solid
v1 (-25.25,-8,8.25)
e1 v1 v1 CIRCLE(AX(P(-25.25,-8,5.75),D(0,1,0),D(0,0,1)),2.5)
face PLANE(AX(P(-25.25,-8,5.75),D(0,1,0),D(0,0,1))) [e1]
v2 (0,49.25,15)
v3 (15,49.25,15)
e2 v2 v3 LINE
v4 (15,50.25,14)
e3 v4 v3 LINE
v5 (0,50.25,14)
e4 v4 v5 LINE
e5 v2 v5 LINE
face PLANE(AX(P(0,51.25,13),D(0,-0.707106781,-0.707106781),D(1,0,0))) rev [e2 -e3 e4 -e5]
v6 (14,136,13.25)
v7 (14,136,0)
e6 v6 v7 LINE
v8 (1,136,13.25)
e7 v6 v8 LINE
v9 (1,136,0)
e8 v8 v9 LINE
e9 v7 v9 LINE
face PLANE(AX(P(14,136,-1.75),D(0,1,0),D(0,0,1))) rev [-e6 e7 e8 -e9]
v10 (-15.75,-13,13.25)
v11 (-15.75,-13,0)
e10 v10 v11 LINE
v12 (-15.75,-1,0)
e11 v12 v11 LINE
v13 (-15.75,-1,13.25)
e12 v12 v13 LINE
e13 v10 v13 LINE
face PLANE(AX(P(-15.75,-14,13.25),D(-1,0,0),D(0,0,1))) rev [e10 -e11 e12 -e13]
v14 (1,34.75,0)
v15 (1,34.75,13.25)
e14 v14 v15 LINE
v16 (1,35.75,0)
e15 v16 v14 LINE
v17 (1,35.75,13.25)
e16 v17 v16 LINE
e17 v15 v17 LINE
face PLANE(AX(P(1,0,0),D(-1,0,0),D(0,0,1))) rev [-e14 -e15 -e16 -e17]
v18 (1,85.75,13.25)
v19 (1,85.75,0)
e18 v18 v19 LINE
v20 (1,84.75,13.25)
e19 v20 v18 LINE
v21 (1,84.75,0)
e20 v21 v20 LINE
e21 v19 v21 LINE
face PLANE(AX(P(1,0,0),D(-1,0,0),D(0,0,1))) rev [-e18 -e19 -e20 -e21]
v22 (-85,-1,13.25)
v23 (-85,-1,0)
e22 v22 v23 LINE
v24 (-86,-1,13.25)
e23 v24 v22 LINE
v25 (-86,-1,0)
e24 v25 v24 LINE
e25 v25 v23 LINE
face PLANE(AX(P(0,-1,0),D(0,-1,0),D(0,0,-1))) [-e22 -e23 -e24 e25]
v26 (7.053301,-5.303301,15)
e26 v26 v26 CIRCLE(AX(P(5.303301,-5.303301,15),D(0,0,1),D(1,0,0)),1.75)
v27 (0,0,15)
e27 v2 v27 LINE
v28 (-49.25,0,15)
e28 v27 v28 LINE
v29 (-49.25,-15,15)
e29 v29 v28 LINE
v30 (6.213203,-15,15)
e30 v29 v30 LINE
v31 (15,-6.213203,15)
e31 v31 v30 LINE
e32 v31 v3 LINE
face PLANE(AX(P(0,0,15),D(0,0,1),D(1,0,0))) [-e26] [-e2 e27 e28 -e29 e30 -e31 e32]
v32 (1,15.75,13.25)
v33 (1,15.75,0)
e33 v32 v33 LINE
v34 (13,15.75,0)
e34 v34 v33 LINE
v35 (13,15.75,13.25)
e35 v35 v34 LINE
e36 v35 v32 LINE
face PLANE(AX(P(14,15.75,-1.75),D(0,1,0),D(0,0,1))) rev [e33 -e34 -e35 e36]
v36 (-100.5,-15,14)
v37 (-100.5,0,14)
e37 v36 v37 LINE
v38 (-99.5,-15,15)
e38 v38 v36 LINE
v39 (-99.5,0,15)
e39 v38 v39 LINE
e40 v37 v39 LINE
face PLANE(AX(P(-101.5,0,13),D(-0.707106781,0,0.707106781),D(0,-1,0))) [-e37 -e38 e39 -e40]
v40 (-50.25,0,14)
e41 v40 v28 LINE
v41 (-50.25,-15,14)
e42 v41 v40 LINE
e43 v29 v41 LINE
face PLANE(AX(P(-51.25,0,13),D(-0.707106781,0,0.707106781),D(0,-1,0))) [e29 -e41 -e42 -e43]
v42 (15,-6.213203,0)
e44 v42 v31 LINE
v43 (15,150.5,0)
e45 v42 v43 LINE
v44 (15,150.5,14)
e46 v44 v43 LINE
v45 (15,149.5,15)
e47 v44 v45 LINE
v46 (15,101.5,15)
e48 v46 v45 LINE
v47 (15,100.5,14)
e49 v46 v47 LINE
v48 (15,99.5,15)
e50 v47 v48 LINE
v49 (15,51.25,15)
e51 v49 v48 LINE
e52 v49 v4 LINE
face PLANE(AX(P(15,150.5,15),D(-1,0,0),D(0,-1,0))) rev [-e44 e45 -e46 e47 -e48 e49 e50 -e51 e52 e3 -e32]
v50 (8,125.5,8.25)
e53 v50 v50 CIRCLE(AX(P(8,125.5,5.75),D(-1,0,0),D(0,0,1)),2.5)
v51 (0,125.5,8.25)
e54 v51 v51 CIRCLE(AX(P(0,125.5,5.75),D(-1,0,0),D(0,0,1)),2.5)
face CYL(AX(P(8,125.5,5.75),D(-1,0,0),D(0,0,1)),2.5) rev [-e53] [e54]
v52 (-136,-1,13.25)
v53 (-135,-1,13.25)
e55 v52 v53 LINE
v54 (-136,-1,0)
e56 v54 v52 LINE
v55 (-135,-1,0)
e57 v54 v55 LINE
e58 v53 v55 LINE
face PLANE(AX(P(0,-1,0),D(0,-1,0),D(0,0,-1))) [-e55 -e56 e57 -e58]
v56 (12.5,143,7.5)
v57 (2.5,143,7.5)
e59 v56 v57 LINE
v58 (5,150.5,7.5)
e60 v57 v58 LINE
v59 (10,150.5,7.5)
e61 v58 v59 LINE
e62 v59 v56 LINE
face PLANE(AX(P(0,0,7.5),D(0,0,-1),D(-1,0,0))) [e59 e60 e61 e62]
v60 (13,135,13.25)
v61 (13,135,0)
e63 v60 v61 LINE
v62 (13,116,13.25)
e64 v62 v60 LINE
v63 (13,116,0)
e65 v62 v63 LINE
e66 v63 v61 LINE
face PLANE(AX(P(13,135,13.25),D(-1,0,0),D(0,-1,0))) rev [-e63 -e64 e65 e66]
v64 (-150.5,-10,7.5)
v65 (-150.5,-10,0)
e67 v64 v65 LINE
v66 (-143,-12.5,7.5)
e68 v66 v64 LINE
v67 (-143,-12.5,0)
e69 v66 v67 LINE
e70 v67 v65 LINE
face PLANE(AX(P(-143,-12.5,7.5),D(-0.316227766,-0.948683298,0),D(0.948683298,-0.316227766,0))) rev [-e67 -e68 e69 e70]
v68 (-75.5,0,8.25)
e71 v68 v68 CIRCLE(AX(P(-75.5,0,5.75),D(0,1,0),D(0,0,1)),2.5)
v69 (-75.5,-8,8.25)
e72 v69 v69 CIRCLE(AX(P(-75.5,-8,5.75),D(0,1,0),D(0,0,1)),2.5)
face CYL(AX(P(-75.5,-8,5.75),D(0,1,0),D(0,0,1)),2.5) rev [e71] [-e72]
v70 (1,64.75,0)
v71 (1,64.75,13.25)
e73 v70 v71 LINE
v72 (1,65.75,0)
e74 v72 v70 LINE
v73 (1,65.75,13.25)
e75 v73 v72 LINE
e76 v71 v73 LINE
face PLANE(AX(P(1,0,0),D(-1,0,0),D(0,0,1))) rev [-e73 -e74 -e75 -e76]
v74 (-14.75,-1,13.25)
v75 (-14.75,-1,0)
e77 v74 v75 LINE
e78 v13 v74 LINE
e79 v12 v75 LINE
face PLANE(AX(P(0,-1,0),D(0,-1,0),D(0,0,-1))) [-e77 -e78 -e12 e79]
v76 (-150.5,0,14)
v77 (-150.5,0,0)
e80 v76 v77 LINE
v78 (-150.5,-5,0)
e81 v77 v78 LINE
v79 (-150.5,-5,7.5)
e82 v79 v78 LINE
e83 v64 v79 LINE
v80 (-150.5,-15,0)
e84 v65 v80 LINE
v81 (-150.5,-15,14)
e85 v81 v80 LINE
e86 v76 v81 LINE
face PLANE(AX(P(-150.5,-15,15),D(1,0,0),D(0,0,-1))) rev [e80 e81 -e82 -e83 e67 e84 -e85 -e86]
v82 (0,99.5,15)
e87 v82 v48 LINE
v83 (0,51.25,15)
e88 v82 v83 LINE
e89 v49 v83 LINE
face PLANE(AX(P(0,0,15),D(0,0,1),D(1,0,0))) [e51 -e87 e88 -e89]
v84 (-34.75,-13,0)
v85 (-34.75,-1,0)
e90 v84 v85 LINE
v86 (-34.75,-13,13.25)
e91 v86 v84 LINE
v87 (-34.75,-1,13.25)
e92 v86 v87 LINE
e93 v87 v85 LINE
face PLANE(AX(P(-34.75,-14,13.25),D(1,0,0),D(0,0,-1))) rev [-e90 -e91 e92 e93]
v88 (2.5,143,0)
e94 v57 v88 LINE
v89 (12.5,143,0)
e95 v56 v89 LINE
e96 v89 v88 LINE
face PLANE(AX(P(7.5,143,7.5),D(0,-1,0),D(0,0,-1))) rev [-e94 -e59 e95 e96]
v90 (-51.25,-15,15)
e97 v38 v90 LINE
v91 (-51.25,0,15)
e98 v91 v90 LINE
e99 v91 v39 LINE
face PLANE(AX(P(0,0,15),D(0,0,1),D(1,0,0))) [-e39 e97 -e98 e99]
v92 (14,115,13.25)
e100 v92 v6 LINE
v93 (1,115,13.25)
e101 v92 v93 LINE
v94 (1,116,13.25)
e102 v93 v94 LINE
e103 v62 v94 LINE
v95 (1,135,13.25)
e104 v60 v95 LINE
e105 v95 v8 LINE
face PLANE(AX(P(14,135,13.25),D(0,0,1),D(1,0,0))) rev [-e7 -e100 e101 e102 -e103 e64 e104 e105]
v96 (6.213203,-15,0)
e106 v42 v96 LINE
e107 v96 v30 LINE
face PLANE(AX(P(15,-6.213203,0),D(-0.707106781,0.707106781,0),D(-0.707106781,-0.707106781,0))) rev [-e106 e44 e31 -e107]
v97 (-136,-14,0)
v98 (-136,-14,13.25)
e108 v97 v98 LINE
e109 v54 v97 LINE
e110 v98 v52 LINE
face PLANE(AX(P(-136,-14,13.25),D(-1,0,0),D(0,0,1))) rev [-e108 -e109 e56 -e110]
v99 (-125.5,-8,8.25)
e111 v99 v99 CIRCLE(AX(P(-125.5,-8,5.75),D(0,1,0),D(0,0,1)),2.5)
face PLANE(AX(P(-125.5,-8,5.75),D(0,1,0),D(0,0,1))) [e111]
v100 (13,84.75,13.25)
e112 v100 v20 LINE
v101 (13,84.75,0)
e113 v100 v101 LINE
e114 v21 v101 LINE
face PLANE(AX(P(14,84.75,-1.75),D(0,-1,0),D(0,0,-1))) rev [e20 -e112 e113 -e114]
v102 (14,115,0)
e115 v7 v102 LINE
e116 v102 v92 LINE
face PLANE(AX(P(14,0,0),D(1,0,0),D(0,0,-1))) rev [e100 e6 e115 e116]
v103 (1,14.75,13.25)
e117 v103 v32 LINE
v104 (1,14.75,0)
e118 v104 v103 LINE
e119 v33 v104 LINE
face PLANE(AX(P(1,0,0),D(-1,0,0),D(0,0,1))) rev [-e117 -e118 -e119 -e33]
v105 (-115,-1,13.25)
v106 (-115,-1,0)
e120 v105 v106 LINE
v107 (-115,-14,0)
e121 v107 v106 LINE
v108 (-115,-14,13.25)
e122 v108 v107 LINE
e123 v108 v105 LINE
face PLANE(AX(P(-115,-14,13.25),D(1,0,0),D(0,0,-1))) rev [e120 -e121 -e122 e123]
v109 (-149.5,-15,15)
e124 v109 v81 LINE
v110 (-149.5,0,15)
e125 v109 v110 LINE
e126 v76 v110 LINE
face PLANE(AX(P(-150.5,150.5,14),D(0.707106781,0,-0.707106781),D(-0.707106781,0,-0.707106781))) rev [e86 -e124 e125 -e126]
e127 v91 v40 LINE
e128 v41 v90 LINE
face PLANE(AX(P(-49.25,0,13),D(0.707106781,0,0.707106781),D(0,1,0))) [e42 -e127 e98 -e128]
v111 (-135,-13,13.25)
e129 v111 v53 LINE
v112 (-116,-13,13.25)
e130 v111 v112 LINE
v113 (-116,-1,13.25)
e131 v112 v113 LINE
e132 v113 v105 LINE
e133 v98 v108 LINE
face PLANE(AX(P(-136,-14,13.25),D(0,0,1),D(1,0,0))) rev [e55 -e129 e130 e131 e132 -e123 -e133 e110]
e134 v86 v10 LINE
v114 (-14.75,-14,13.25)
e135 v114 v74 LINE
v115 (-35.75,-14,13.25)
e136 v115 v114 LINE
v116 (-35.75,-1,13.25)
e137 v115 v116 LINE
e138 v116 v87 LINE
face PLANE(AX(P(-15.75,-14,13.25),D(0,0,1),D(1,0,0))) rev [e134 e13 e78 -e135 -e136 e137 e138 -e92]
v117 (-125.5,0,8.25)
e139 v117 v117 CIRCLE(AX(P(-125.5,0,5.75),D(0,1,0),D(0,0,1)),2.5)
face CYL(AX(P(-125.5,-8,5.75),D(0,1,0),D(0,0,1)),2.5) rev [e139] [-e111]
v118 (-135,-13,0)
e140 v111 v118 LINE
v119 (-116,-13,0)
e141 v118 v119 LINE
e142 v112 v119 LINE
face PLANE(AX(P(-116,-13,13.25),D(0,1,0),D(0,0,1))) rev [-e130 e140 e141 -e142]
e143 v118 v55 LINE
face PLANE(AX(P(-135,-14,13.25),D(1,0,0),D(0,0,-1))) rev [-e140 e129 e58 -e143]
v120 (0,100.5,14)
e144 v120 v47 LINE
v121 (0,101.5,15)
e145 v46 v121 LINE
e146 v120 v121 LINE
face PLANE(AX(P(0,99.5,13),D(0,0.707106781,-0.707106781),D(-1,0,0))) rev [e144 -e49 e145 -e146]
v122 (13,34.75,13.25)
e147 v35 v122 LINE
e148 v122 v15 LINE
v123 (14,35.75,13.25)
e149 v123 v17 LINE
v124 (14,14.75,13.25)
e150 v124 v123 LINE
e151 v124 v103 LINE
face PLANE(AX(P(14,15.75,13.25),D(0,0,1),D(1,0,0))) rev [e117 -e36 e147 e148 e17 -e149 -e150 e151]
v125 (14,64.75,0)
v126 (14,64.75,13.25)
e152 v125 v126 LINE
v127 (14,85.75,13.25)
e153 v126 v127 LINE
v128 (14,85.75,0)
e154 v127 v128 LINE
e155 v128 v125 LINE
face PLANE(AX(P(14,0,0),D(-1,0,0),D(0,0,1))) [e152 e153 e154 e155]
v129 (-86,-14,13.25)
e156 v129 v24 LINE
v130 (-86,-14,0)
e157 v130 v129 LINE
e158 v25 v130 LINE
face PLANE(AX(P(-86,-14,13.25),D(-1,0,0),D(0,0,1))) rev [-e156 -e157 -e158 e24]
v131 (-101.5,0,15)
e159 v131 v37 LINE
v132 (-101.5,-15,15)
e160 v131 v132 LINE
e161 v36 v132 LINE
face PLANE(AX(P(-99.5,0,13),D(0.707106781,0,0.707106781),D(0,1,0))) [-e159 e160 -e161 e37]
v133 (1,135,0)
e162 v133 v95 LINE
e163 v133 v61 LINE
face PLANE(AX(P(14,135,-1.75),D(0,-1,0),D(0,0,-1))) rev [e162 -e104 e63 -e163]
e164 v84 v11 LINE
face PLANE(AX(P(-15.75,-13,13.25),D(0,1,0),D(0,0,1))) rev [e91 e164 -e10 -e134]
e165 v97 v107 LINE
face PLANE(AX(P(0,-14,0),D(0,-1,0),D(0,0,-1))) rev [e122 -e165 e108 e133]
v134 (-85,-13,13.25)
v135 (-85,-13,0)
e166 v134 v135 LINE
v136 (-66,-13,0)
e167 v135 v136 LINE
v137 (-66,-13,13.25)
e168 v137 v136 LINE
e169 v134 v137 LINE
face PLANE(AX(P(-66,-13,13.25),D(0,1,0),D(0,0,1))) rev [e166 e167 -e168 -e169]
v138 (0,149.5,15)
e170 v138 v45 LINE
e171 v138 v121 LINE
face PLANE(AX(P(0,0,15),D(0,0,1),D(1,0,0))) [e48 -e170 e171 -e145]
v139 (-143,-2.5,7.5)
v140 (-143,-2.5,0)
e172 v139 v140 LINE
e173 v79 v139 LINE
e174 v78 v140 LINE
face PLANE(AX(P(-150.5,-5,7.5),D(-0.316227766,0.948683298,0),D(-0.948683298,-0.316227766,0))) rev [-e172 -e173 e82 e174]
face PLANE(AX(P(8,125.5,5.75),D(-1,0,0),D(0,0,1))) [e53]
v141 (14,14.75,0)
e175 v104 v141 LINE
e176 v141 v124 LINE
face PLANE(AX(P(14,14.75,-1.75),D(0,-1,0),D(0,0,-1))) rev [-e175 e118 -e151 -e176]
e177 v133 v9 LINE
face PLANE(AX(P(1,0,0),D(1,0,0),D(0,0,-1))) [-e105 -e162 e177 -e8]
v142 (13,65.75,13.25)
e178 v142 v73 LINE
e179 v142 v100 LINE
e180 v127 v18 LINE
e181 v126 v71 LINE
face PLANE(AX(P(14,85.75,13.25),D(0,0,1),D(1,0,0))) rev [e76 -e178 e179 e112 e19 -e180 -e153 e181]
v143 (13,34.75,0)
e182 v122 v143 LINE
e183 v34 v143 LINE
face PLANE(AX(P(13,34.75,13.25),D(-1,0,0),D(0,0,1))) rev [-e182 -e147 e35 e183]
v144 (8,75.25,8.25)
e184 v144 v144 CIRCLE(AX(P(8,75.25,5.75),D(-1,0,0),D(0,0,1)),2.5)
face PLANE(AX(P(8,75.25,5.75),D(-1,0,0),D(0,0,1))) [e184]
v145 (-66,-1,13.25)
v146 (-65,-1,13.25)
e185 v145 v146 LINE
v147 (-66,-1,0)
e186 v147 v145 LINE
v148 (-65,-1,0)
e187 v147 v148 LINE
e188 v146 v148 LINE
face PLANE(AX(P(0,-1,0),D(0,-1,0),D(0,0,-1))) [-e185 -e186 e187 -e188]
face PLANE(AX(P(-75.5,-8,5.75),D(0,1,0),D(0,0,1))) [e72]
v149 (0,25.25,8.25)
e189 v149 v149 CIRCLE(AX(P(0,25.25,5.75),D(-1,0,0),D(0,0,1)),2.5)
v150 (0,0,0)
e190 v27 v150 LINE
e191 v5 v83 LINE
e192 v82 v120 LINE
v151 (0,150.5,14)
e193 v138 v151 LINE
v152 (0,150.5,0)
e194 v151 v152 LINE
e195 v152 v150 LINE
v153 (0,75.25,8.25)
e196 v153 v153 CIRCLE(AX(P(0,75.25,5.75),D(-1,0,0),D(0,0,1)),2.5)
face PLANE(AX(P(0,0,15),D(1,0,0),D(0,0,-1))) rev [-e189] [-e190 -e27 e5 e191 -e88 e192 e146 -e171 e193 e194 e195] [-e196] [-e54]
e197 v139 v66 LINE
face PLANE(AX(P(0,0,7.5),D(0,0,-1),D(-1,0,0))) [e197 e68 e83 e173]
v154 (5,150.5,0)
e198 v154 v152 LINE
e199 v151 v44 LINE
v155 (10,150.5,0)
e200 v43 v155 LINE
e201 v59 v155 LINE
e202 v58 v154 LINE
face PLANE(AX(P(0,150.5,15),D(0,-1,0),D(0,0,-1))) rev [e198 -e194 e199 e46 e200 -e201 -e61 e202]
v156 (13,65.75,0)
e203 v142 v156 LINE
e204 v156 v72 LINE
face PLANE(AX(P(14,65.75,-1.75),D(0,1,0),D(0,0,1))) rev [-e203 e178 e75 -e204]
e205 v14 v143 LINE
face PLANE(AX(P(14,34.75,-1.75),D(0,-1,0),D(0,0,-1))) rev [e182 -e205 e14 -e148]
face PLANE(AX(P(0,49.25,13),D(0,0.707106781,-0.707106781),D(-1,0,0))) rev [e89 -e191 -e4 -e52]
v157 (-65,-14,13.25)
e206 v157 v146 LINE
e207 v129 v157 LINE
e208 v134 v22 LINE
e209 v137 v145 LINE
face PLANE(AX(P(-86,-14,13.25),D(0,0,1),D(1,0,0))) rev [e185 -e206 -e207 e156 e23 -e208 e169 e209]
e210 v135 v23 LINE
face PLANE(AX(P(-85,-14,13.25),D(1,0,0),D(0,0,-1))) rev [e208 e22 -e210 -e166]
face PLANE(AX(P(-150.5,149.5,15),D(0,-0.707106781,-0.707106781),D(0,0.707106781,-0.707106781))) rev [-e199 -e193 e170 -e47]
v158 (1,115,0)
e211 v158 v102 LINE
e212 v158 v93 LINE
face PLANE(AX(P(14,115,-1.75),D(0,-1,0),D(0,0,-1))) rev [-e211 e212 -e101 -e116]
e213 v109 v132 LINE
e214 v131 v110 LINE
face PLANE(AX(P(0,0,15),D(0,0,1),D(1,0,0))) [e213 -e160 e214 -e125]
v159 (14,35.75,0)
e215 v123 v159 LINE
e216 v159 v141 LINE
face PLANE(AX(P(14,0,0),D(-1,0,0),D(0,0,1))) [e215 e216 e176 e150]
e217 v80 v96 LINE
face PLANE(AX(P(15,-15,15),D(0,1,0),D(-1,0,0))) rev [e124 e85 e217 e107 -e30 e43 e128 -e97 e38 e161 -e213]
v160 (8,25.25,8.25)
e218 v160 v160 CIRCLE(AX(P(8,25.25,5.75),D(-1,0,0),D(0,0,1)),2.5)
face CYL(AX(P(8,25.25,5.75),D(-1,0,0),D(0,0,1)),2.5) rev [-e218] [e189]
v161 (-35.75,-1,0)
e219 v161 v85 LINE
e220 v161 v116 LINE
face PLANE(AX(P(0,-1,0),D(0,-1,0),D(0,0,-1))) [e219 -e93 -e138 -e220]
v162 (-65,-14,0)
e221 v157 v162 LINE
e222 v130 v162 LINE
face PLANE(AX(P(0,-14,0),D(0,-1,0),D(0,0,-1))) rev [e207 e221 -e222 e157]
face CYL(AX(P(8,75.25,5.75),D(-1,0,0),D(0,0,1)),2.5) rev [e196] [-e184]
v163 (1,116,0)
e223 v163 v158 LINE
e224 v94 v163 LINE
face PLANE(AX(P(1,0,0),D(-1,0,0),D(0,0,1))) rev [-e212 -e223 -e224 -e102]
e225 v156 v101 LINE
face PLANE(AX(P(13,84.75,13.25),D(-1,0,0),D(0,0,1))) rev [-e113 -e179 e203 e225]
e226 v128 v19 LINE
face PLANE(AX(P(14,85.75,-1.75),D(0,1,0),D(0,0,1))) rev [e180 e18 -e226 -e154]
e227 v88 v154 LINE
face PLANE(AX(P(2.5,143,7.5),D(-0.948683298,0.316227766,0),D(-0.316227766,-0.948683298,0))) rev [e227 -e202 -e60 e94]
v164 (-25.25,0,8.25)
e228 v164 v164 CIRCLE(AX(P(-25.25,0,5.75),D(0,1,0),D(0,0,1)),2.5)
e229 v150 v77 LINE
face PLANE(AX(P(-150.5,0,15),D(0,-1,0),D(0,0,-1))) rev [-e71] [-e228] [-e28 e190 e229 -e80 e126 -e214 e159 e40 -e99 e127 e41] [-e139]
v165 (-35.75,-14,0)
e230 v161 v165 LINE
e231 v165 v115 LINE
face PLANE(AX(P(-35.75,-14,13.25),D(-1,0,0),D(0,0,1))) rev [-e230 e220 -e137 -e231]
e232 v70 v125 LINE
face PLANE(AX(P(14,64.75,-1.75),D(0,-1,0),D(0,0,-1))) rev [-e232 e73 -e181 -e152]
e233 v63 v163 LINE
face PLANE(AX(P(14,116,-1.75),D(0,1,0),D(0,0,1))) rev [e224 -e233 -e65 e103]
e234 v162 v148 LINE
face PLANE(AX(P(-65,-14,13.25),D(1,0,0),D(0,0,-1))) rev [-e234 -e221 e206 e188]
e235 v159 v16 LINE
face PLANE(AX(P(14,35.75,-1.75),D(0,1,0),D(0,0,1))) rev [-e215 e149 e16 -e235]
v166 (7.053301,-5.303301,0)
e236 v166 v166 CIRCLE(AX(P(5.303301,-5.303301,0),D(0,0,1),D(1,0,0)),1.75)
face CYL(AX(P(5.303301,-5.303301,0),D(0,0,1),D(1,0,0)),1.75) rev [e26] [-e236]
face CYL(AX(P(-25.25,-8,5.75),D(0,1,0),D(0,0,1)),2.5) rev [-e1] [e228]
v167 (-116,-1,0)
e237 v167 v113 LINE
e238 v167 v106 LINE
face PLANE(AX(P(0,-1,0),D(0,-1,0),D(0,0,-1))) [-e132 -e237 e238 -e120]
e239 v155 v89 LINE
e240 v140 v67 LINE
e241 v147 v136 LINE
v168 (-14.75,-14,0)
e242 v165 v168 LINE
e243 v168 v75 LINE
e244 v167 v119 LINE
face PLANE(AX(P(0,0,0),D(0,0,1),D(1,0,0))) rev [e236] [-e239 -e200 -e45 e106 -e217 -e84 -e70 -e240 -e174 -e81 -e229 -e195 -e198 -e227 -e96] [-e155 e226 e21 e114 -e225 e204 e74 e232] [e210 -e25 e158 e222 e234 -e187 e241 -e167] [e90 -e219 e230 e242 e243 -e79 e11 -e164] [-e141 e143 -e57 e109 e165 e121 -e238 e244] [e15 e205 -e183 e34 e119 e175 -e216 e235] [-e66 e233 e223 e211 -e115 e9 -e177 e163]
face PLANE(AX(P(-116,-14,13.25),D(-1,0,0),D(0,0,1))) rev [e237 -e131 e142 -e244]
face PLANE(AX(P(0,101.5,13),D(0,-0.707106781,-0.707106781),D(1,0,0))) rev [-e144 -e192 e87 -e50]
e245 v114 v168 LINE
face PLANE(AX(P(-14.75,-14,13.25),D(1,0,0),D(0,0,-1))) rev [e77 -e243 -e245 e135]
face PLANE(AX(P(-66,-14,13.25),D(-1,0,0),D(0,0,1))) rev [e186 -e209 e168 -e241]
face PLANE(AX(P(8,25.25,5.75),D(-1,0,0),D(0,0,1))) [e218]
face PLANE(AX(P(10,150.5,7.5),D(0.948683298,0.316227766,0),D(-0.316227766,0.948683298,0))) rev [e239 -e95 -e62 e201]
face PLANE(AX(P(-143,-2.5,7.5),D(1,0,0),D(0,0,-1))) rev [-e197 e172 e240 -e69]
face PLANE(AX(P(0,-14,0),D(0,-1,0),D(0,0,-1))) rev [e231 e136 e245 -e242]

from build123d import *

# Parameters (mm, degrees)
BODY_DEPTH                 = 15
SKETCH3_W                  = 2
SKETCH3_H                  = 15
SKETCH3_W_2                = 15
SKETCH3_H_2                = 2
FIELD_CUT_DEPTH            = 2
FIELD_CHAMFER_SIZE         = 2
CLICK_CHAMFER_1_DEPTH      = 225.199687779
CLICK_CHAMFER_1_DEPTH_BACK = 225.199687779
CLICK_CHAMFER_2_DEPTH      = 225.199687779
CLICK_CHAMFER_2_DEPTH_BACK = 225.199687779
SKETCH7_R                  = 2.5
LED_HOLE_2_DEPTH           = 8
SKETCH8_R                  = 2.5
LED_HOLE_1_DEPTH           = 8
CORNER_CHAMFER_DEPTH       = 214.367054627
CORNER_CHAMFER_DEPTH_BACK  = 214.367054627
CLICK_HOLE_DEPTH           = 7.5
SKETCH12_W                 = 1
SKETCH12_H                 = 15
LIGHT_GUIDE_1_DEPTH        = 13
SKETCH13_W                 = 15
SKETCH13_H                 = 1
LIGHT_GUIDE_2_DEPTH        = 13
MOUNTING_HOLE_DEPTH        = 214.367054627
MOUNTING_HOLE_DEPTH_BACK   = 214.367054627
SKETCH14_R                 = 1.75
SKETCH15_W                 = 1
SKETCH15_H                 = 19
SKETCH15_W_2               = 19
SKETCH15_H_2               = 1
CUT_EXTRUDE1_DEPTH         = 13.25


with BuildPart() as part:
    # Sketch1 → Body (new body)
    with BuildSketch(Plane.XY):
        Polygon((0, 0), (0, 150.5), (15, 150.5), (15, -15), (-150.5, -15), (-150.5, 0), align=None)
    extrude(amount=BODY_DEPTH)

    # Sketch3 → Field Cut (cut)
    with BuildSketch(Plane.XY.offset(15)):
        with Locations((-50.25, -7.5)):
            Rectangle(SKETCH3_W, SKETCH3_H)
        with Locations((-100.5, -7.5)):
            Rectangle(SKETCH3_W, SKETCH3_H)
        with Locations((7.5, 50.25)):
            Rectangle(SKETCH3_W_2, SKETCH3_H_2)
        with Locations((7.5, 100.5)):
            Rectangle(SKETCH3_W_2, SKETCH3_H_2)
    extrude(amount=-FIELD_CUT_DEPTH, mode=Mode.SUBTRACT)

    # Field Chamfer
    # the kernel refuses this chamfer: 2 mm, written as the material it adds along each edge
    with BuildSketch(Plane(origin=(-101.5, 0, 13), x_dir=(0.9996219169112968, 0, -0.027495876610586414), z_dir=(0, -1, 0))) as field_chamfer_piece_1_section:
        Polygon((FIELD_CHAMFER_SIZE * 0.999621916911, FIELD_CHAMFER_SIZE * 0.0274958766106), (-FIELD_CHAMFER_SIZE * 0.0274958766106, FIELD_CHAMFER_SIZE * 0.999621916911), (0, 0), align=None)
    field_chamfer_piece_1 = extrude(amount=15, mode=Mode.PRIVATE)
    field_chamfer_piece_1 = split(field_chamfer_piece_1, bisect_by=Plane(origin=(-100.839191691, -7.5, 15), z_dir=(0, 0, -1)), keep=Keep.TOP, mode=Mode.PRIVATE)
    add(field_chamfer_piece_1)
    with BuildSketch(Plane(origin=(-99.5, -15, 13), x_dir=(0.02749587661058907, 0, 0.9996219169112965), z_dir=(0, 1, 0))) as field_chamfer_piece_2_section:
        Polygon((FIELD_CHAMFER_SIZE * 0.999621916911, -FIELD_CHAMFER_SIZE * 0.0274958766106), (-FIELD_CHAMFER_SIZE * 0.0274958766106, -FIELD_CHAMFER_SIZE * 0.999621916911), (0, 0), align=None)
    field_chamfer_piece_2 = extrude(amount=15, mode=Mode.PRIVATE)
    field_chamfer_piece_2 = split(field_chamfer_piece_2, bisect_by=Plane(origin=(-100.160808309, -7.5, 15), z_dir=(0, 0, -1)), keep=Keep.TOP, mode=Mode.PRIVATE)
    add(field_chamfer_piece_2)
    with BuildSketch(Plane(origin=(-51.25, 0, 13), x_dir=(0.9996219169112968, 0, -0.02749587661058651), z_dir=(0, -1, 0))) as field_chamfer_piece_3_section:
        Polygon((FIELD_CHAMFER_SIZE * 0.999621916911, FIELD_CHAMFER_SIZE * 0.0274958766106), (-FIELD_CHAMFER_SIZE * 0.0274958766106, FIELD_CHAMFER_SIZE * 0.999621916911), (0, 0), align=None)
    field_chamfer_piece_3 = extrude(amount=15, mode=Mode.PRIVATE)
    field_chamfer_piece_3 = split(field_chamfer_piece_3, bisect_by=Plane(origin=(-50.589191691, -7.5, 15), z_dir=(0, 0, -1)), keep=Keep.TOP, mode=Mode.PRIVATE)
    add(field_chamfer_piece_3)
    with BuildSketch(Plane(origin=(-49.25, -15, 13), x_dir=(0.027495876610585623, 0, 0.9996219169112968), z_dir=(0, 1, 0))) as field_chamfer_piece_4_section:
        Polygon((FIELD_CHAMFER_SIZE * 0.999621916911, -FIELD_CHAMFER_SIZE * 0.0274958766106), (-FIELD_CHAMFER_SIZE * 0.0274958766106, -FIELD_CHAMFER_SIZE * 0.999621916911), (0, 0), align=None)
    field_chamfer_piece_4 = extrude(amount=15, mode=Mode.PRIVATE)
    field_chamfer_piece_4 = split(field_chamfer_piece_4, bisect_by=Plane(origin=(-49.910808309, -7.5, 15), z_dir=(0, 0, -1)), keep=Keep.TOP, mode=Mode.PRIVATE)
    add(field_chamfer_piece_4)
    with BuildSketch(Plane(origin=(15, 49.25, 13), x_dir=(0, 0.9996219169112968, -0.02749587661058651), z_dir=(-1, 0, 0))) as field_chamfer_piece_5_section:
        Polygon((FIELD_CHAMFER_SIZE * 0.999621916911, -FIELD_CHAMFER_SIZE * 0.0274958766106), (-FIELD_CHAMFER_SIZE * 0.0274958766106, -FIELD_CHAMFER_SIZE * 0.999621916911), (0, 0), align=None)
    field_chamfer_piece_5 = extrude(amount=15, mode=Mode.PRIVATE)
    field_chamfer_piece_5 = split(field_chamfer_piece_5, bisect_by=Plane(origin=(7.5, 49.910808309, 15), z_dir=(0, 0, -1)), keep=Keep.TOP, mode=Mode.PRIVATE)
    add(field_chamfer_piece_5)
    with BuildSketch(Plane(origin=(0, 51.25, 13), x_dir=(0, 0.027495876610585623, 0.9996219169112968), z_dir=(1, 0, 0))) as field_chamfer_piece_6_section:
        Polygon((FIELD_CHAMFER_SIZE * 0.999621916911, FIELD_CHAMFER_SIZE * 0.0274958766106), (-FIELD_CHAMFER_SIZE * 0.0274958766106, FIELD_CHAMFER_SIZE * 0.999621916911), (0, 0), align=None)
    field_chamfer_piece_6 = extrude(amount=15, mode=Mode.PRIVATE)
    field_chamfer_piece_6 = split(field_chamfer_piece_6, bisect_by=Plane(origin=(7.5, 50.589191691, 15), z_dir=(0, 0, -1)), keep=Keep.TOP, mode=Mode.PRIVATE)
    add(field_chamfer_piece_6)
    with BuildSketch(Plane(origin=(0, 101.5, 13), x_dir=(0, 0.02749587661058907, 0.9996219169112965), z_dir=(1, 0, 0))) as field_chamfer_piece_7_section:
        Polygon((FIELD_CHAMFER_SIZE * 0.999621916911, FIELD_CHAMFER_SIZE * 0.0274958766106), (-FIELD_CHAMFER_SIZE * 0.0274958766106, FIELD_CHAMFER_SIZE * 0.999621916911), (0, 0), align=None)
    field_chamfer_piece_7 = extrude(amount=15, mode=Mode.PRIVATE)
    field_chamfer_piece_7 = split(field_chamfer_piece_7, bisect_by=Plane(origin=(7.5, 100.839191691, 15), z_dir=(0, 0, -1)), keep=Keep.TOP, mode=Mode.PRIVATE)
    add(field_chamfer_piece_7)
    with BuildSketch(Plane(origin=(15, 99.5, 13), x_dir=(0, 0.9996219169112968, -0.027495876610586414), z_dir=(-1, 0, 0))) as field_chamfer_piece_8_section:
        Polygon((FIELD_CHAMFER_SIZE * 0.999621916911, -FIELD_CHAMFER_SIZE * 0.0274958766106), (-FIELD_CHAMFER_SIZE * 0.0274958766106, -FIELD_CHAMFER_SIZE * 0.999621916911), (0, 0), align=None)
    field_chamfer_piece_8 = extrude(amount=15, mode=Mode.PRIVATE)
    field_chamfer_piece_8 = split(field_chamfer_piece_8, bisect_by=Plane(origin=(7.5, 100.160808309, 15), z_dir=(0, 0, -1)), keep=Keep.TOP, mode=Mode.PRIVATE)
    add(field_chamfer_piece_8)

    # Sketch4 → Click Chamfer 1 (cut, two sides: drawn at the far end of the back side and taken through both)
    with BuildSketch(Plane.XZ.offset(15).offset(-CLICK_CHAMFER_1_DEPTH_BACK)):
        Polygon((-150.5, 15), (-150.5, 14), (-149.5, 15), align=None)
    extrude(amount=CLICK_CHAMFER_1_DEPTH + CLICK_CHAMFER_1_DEPTH_BACK, mode=Mode.SUBTRACT)

    # Sketch5 → Click Chamfer 2 (cut, two sides: drawn at the far end of the back side and taken through both)
    with BuildSketch(Plane(origin=(15, 0, 0), x_dir=(0, 0, -1), z_dir=(1, 0, 0)).offset(-CLICK_CHAMFER_2_DEPTH_BACK)):
        Polygon((-15, 150.5), (-15, 149.5), (-14, 150.5), align=None)
    extrude(amount=CLICK_CHAMFER_2_DEPTH + CLICK_CHAMFER_2_DEPTH_BACK, mode=Mode.SUBTRACT)

    # Sketch7 → LED Hole 2 (cut)
    with BuildSketch(Plane.ZY):
        with Locations((5.75, 75.25)):
            Circle(SKETCH7_R)
        with Locations((5.75, 125.5)):
            Circle(SKETCH7_R)
        with Locations((5.75, 25.25)):
            Circle(SKETCH7_R)
    extrude(amount=-LED_HOLE_2_DEPTH, mode=Mode.SUBTRACT)

    # Sketch8 → LED Hole 1 (cut)
    with BuildSketch(Plane(origin=(0, 0, 0), x_dir=(1, 0, 0), z_dir=(0, 1, 0))):
        with Locations(Location((-125.5, -5.75, 0), (0, 0, 270))):
            Circle(SKETCH8_R)
        with Locations(Location((-75.5, -5.75, 0), (0, 0, 270))):
            Circle(SKETCH8_R)
        with Locations(Location((-25.25, -5.75, 0), (0, 0, 270))):
            Circle(SKETCH8_R)
    extrude(amount=-LED_HOLE_1_DEPTH, mode=Mode.SUBTRACT)

    # Sketch9 → Corner Chamfer (cut, two sides: drawn at the far end of the back side and taken through both)
    with BuildSketch(Plane.XY.offset(15).offset(-CORNER_CHAMFER_DEPTH_BACK)):
        Polygon((15, -6.213203436), (6.213203436, -15), (15, -15), align=None)
    extrude(amount=CORNER_CHAMFER_DEPTH + CORNER_CHAMFER_DEPTH_BACK, mode=Mode.SUBTRACT)

    # Sketch10 → Click Hole (cut)
    with BuildSketch(Plane(origin=(0, 0, 0), x_dir=(-1, 0, 0), z_dir=(0, 0, -1))):
        Polygon((150.5, -5), (143, -2.5), (143, -12.5), (150.5, -10), align=None)
        Polygon((-7.5, 150.5), (-10, 150.5), (-12.5, 143), (-7.5, 143), (-2.5, 143), (-5, 150.5), align=None)
    extrude(amount=-CLICK_HOLE_DEPTH, mode=Mode.SUBTRACT)

    # Sketch12 → Light Guide 1 (cut)
    with BuildSketch(Plane(origin=(0, -1, 0), x_dir=(1, 0, 0), z_dir=(0, 1, 0))):
        with Locations((-35.25, -5.75)):
            Rectangle(SKETCH12_W, SKETCH12_H)
        with Locations((-15.25, -5.75)):
            Rectangle(SKETCH12_W, SKETCH12_H)
        with Locations((-65.5, -5.75)):
            Rectangle(SKETCH12_W, SKETCH12_H)
        with Locations((-85.5, -5.75)):
            Rectangle(SKETCH12_W, SKETCH12_H)
        with Locations((-115.5, -5.75)):
            Rectangle(SKETCH12_W, SKETCH12_H)
        with Locations((-135.5, -5.75)):
            Rectangle(SKETCH12_W, SKETCH12_H)
    extrude(amount=-LIGHT_GUIDE_1_DEPTH, mode=Mode.SUBTRACT)

    # Sketch13 → Light Guide 2 (cut)
    with BuildSketch(Plane.ZY.offset(-1)):
        with Locations((5.75, 35.25)):
            Rectangle(SKETCH13_W, SKETCH13_H)
        with Locations((5.75, 15.25)):
            Rectangle(SKETCH13_W, SKETCH13_H)
        with Locations((5.75, 65.25)):
            Rectangle(SKETCH13_W, SKETCH13_H)
        with Locations((5.75, 85.25)):
            Rectangle(SKETCH13_W, SKETCH13_H)
        with Locations((5.75, 115.5)):
            Rectangle(SKETCH13_W, SKETCH13_H)
        with Locations((5.75, 135.5)):
            Rectangle(SKETCH13_W, SKETCH13_H)
    extrude(amount=-LIGHT_GUIDE_2_DEPTH, mode=Mode.SUBTRACT)

    # Sketch14 → Mounting Hole (cut, two sides: drawn at the far end of the back side and taken through both)
    with BuildSketch(Plane.XY.offset(15).offset(-MOUNTING_HOLE_DEPTH_BACK)):
        with Locations((5.303300859, -5.303300859)):
            Circle(SKETCH14_R)
    extrude(amount=MOUNTING_HOLE_DEPTH + MOUNTING_HOLE_DEPTH_BACK, mode=Mode.SUBTRACT)

    # Sketch15 → Cut-Extrude1 (cut)
    with BuildSketch(Plane(origin=(0, 0, 0), x_dir=(-1, 0, 0), z_dir=(0, 0, -1))):
        with Locations((-13.5, 125.5)):
            Rectangle(SKETCH15_W, SKETCH15_H)
        with Locations((-13.5, 75.25)):
            Rectangle(SKETCH15_W, SKETCH15_H)
        with Locations((-13.5, 25.25)):
            Rectangle(SKETCH15_W, SKETCH15_H)
        with Locations((25.25, -13.5)):
            Rectangle(SKETCH15_W_2, SKETCH15_H_2)
        with Locations((75.5, -13.5)):
            Rectangle(SKETCH15_W_2, SKETCH15_H_2)
        with Locations((125.5, -13.5)):
            Rectangle(SKETCH15_W_2, SKETCH15_H_2)
    extrude(amount=-CUT_EXTRUDE1_DEPTH, mode=Mode.SUBTRACT)


solid = part.part
